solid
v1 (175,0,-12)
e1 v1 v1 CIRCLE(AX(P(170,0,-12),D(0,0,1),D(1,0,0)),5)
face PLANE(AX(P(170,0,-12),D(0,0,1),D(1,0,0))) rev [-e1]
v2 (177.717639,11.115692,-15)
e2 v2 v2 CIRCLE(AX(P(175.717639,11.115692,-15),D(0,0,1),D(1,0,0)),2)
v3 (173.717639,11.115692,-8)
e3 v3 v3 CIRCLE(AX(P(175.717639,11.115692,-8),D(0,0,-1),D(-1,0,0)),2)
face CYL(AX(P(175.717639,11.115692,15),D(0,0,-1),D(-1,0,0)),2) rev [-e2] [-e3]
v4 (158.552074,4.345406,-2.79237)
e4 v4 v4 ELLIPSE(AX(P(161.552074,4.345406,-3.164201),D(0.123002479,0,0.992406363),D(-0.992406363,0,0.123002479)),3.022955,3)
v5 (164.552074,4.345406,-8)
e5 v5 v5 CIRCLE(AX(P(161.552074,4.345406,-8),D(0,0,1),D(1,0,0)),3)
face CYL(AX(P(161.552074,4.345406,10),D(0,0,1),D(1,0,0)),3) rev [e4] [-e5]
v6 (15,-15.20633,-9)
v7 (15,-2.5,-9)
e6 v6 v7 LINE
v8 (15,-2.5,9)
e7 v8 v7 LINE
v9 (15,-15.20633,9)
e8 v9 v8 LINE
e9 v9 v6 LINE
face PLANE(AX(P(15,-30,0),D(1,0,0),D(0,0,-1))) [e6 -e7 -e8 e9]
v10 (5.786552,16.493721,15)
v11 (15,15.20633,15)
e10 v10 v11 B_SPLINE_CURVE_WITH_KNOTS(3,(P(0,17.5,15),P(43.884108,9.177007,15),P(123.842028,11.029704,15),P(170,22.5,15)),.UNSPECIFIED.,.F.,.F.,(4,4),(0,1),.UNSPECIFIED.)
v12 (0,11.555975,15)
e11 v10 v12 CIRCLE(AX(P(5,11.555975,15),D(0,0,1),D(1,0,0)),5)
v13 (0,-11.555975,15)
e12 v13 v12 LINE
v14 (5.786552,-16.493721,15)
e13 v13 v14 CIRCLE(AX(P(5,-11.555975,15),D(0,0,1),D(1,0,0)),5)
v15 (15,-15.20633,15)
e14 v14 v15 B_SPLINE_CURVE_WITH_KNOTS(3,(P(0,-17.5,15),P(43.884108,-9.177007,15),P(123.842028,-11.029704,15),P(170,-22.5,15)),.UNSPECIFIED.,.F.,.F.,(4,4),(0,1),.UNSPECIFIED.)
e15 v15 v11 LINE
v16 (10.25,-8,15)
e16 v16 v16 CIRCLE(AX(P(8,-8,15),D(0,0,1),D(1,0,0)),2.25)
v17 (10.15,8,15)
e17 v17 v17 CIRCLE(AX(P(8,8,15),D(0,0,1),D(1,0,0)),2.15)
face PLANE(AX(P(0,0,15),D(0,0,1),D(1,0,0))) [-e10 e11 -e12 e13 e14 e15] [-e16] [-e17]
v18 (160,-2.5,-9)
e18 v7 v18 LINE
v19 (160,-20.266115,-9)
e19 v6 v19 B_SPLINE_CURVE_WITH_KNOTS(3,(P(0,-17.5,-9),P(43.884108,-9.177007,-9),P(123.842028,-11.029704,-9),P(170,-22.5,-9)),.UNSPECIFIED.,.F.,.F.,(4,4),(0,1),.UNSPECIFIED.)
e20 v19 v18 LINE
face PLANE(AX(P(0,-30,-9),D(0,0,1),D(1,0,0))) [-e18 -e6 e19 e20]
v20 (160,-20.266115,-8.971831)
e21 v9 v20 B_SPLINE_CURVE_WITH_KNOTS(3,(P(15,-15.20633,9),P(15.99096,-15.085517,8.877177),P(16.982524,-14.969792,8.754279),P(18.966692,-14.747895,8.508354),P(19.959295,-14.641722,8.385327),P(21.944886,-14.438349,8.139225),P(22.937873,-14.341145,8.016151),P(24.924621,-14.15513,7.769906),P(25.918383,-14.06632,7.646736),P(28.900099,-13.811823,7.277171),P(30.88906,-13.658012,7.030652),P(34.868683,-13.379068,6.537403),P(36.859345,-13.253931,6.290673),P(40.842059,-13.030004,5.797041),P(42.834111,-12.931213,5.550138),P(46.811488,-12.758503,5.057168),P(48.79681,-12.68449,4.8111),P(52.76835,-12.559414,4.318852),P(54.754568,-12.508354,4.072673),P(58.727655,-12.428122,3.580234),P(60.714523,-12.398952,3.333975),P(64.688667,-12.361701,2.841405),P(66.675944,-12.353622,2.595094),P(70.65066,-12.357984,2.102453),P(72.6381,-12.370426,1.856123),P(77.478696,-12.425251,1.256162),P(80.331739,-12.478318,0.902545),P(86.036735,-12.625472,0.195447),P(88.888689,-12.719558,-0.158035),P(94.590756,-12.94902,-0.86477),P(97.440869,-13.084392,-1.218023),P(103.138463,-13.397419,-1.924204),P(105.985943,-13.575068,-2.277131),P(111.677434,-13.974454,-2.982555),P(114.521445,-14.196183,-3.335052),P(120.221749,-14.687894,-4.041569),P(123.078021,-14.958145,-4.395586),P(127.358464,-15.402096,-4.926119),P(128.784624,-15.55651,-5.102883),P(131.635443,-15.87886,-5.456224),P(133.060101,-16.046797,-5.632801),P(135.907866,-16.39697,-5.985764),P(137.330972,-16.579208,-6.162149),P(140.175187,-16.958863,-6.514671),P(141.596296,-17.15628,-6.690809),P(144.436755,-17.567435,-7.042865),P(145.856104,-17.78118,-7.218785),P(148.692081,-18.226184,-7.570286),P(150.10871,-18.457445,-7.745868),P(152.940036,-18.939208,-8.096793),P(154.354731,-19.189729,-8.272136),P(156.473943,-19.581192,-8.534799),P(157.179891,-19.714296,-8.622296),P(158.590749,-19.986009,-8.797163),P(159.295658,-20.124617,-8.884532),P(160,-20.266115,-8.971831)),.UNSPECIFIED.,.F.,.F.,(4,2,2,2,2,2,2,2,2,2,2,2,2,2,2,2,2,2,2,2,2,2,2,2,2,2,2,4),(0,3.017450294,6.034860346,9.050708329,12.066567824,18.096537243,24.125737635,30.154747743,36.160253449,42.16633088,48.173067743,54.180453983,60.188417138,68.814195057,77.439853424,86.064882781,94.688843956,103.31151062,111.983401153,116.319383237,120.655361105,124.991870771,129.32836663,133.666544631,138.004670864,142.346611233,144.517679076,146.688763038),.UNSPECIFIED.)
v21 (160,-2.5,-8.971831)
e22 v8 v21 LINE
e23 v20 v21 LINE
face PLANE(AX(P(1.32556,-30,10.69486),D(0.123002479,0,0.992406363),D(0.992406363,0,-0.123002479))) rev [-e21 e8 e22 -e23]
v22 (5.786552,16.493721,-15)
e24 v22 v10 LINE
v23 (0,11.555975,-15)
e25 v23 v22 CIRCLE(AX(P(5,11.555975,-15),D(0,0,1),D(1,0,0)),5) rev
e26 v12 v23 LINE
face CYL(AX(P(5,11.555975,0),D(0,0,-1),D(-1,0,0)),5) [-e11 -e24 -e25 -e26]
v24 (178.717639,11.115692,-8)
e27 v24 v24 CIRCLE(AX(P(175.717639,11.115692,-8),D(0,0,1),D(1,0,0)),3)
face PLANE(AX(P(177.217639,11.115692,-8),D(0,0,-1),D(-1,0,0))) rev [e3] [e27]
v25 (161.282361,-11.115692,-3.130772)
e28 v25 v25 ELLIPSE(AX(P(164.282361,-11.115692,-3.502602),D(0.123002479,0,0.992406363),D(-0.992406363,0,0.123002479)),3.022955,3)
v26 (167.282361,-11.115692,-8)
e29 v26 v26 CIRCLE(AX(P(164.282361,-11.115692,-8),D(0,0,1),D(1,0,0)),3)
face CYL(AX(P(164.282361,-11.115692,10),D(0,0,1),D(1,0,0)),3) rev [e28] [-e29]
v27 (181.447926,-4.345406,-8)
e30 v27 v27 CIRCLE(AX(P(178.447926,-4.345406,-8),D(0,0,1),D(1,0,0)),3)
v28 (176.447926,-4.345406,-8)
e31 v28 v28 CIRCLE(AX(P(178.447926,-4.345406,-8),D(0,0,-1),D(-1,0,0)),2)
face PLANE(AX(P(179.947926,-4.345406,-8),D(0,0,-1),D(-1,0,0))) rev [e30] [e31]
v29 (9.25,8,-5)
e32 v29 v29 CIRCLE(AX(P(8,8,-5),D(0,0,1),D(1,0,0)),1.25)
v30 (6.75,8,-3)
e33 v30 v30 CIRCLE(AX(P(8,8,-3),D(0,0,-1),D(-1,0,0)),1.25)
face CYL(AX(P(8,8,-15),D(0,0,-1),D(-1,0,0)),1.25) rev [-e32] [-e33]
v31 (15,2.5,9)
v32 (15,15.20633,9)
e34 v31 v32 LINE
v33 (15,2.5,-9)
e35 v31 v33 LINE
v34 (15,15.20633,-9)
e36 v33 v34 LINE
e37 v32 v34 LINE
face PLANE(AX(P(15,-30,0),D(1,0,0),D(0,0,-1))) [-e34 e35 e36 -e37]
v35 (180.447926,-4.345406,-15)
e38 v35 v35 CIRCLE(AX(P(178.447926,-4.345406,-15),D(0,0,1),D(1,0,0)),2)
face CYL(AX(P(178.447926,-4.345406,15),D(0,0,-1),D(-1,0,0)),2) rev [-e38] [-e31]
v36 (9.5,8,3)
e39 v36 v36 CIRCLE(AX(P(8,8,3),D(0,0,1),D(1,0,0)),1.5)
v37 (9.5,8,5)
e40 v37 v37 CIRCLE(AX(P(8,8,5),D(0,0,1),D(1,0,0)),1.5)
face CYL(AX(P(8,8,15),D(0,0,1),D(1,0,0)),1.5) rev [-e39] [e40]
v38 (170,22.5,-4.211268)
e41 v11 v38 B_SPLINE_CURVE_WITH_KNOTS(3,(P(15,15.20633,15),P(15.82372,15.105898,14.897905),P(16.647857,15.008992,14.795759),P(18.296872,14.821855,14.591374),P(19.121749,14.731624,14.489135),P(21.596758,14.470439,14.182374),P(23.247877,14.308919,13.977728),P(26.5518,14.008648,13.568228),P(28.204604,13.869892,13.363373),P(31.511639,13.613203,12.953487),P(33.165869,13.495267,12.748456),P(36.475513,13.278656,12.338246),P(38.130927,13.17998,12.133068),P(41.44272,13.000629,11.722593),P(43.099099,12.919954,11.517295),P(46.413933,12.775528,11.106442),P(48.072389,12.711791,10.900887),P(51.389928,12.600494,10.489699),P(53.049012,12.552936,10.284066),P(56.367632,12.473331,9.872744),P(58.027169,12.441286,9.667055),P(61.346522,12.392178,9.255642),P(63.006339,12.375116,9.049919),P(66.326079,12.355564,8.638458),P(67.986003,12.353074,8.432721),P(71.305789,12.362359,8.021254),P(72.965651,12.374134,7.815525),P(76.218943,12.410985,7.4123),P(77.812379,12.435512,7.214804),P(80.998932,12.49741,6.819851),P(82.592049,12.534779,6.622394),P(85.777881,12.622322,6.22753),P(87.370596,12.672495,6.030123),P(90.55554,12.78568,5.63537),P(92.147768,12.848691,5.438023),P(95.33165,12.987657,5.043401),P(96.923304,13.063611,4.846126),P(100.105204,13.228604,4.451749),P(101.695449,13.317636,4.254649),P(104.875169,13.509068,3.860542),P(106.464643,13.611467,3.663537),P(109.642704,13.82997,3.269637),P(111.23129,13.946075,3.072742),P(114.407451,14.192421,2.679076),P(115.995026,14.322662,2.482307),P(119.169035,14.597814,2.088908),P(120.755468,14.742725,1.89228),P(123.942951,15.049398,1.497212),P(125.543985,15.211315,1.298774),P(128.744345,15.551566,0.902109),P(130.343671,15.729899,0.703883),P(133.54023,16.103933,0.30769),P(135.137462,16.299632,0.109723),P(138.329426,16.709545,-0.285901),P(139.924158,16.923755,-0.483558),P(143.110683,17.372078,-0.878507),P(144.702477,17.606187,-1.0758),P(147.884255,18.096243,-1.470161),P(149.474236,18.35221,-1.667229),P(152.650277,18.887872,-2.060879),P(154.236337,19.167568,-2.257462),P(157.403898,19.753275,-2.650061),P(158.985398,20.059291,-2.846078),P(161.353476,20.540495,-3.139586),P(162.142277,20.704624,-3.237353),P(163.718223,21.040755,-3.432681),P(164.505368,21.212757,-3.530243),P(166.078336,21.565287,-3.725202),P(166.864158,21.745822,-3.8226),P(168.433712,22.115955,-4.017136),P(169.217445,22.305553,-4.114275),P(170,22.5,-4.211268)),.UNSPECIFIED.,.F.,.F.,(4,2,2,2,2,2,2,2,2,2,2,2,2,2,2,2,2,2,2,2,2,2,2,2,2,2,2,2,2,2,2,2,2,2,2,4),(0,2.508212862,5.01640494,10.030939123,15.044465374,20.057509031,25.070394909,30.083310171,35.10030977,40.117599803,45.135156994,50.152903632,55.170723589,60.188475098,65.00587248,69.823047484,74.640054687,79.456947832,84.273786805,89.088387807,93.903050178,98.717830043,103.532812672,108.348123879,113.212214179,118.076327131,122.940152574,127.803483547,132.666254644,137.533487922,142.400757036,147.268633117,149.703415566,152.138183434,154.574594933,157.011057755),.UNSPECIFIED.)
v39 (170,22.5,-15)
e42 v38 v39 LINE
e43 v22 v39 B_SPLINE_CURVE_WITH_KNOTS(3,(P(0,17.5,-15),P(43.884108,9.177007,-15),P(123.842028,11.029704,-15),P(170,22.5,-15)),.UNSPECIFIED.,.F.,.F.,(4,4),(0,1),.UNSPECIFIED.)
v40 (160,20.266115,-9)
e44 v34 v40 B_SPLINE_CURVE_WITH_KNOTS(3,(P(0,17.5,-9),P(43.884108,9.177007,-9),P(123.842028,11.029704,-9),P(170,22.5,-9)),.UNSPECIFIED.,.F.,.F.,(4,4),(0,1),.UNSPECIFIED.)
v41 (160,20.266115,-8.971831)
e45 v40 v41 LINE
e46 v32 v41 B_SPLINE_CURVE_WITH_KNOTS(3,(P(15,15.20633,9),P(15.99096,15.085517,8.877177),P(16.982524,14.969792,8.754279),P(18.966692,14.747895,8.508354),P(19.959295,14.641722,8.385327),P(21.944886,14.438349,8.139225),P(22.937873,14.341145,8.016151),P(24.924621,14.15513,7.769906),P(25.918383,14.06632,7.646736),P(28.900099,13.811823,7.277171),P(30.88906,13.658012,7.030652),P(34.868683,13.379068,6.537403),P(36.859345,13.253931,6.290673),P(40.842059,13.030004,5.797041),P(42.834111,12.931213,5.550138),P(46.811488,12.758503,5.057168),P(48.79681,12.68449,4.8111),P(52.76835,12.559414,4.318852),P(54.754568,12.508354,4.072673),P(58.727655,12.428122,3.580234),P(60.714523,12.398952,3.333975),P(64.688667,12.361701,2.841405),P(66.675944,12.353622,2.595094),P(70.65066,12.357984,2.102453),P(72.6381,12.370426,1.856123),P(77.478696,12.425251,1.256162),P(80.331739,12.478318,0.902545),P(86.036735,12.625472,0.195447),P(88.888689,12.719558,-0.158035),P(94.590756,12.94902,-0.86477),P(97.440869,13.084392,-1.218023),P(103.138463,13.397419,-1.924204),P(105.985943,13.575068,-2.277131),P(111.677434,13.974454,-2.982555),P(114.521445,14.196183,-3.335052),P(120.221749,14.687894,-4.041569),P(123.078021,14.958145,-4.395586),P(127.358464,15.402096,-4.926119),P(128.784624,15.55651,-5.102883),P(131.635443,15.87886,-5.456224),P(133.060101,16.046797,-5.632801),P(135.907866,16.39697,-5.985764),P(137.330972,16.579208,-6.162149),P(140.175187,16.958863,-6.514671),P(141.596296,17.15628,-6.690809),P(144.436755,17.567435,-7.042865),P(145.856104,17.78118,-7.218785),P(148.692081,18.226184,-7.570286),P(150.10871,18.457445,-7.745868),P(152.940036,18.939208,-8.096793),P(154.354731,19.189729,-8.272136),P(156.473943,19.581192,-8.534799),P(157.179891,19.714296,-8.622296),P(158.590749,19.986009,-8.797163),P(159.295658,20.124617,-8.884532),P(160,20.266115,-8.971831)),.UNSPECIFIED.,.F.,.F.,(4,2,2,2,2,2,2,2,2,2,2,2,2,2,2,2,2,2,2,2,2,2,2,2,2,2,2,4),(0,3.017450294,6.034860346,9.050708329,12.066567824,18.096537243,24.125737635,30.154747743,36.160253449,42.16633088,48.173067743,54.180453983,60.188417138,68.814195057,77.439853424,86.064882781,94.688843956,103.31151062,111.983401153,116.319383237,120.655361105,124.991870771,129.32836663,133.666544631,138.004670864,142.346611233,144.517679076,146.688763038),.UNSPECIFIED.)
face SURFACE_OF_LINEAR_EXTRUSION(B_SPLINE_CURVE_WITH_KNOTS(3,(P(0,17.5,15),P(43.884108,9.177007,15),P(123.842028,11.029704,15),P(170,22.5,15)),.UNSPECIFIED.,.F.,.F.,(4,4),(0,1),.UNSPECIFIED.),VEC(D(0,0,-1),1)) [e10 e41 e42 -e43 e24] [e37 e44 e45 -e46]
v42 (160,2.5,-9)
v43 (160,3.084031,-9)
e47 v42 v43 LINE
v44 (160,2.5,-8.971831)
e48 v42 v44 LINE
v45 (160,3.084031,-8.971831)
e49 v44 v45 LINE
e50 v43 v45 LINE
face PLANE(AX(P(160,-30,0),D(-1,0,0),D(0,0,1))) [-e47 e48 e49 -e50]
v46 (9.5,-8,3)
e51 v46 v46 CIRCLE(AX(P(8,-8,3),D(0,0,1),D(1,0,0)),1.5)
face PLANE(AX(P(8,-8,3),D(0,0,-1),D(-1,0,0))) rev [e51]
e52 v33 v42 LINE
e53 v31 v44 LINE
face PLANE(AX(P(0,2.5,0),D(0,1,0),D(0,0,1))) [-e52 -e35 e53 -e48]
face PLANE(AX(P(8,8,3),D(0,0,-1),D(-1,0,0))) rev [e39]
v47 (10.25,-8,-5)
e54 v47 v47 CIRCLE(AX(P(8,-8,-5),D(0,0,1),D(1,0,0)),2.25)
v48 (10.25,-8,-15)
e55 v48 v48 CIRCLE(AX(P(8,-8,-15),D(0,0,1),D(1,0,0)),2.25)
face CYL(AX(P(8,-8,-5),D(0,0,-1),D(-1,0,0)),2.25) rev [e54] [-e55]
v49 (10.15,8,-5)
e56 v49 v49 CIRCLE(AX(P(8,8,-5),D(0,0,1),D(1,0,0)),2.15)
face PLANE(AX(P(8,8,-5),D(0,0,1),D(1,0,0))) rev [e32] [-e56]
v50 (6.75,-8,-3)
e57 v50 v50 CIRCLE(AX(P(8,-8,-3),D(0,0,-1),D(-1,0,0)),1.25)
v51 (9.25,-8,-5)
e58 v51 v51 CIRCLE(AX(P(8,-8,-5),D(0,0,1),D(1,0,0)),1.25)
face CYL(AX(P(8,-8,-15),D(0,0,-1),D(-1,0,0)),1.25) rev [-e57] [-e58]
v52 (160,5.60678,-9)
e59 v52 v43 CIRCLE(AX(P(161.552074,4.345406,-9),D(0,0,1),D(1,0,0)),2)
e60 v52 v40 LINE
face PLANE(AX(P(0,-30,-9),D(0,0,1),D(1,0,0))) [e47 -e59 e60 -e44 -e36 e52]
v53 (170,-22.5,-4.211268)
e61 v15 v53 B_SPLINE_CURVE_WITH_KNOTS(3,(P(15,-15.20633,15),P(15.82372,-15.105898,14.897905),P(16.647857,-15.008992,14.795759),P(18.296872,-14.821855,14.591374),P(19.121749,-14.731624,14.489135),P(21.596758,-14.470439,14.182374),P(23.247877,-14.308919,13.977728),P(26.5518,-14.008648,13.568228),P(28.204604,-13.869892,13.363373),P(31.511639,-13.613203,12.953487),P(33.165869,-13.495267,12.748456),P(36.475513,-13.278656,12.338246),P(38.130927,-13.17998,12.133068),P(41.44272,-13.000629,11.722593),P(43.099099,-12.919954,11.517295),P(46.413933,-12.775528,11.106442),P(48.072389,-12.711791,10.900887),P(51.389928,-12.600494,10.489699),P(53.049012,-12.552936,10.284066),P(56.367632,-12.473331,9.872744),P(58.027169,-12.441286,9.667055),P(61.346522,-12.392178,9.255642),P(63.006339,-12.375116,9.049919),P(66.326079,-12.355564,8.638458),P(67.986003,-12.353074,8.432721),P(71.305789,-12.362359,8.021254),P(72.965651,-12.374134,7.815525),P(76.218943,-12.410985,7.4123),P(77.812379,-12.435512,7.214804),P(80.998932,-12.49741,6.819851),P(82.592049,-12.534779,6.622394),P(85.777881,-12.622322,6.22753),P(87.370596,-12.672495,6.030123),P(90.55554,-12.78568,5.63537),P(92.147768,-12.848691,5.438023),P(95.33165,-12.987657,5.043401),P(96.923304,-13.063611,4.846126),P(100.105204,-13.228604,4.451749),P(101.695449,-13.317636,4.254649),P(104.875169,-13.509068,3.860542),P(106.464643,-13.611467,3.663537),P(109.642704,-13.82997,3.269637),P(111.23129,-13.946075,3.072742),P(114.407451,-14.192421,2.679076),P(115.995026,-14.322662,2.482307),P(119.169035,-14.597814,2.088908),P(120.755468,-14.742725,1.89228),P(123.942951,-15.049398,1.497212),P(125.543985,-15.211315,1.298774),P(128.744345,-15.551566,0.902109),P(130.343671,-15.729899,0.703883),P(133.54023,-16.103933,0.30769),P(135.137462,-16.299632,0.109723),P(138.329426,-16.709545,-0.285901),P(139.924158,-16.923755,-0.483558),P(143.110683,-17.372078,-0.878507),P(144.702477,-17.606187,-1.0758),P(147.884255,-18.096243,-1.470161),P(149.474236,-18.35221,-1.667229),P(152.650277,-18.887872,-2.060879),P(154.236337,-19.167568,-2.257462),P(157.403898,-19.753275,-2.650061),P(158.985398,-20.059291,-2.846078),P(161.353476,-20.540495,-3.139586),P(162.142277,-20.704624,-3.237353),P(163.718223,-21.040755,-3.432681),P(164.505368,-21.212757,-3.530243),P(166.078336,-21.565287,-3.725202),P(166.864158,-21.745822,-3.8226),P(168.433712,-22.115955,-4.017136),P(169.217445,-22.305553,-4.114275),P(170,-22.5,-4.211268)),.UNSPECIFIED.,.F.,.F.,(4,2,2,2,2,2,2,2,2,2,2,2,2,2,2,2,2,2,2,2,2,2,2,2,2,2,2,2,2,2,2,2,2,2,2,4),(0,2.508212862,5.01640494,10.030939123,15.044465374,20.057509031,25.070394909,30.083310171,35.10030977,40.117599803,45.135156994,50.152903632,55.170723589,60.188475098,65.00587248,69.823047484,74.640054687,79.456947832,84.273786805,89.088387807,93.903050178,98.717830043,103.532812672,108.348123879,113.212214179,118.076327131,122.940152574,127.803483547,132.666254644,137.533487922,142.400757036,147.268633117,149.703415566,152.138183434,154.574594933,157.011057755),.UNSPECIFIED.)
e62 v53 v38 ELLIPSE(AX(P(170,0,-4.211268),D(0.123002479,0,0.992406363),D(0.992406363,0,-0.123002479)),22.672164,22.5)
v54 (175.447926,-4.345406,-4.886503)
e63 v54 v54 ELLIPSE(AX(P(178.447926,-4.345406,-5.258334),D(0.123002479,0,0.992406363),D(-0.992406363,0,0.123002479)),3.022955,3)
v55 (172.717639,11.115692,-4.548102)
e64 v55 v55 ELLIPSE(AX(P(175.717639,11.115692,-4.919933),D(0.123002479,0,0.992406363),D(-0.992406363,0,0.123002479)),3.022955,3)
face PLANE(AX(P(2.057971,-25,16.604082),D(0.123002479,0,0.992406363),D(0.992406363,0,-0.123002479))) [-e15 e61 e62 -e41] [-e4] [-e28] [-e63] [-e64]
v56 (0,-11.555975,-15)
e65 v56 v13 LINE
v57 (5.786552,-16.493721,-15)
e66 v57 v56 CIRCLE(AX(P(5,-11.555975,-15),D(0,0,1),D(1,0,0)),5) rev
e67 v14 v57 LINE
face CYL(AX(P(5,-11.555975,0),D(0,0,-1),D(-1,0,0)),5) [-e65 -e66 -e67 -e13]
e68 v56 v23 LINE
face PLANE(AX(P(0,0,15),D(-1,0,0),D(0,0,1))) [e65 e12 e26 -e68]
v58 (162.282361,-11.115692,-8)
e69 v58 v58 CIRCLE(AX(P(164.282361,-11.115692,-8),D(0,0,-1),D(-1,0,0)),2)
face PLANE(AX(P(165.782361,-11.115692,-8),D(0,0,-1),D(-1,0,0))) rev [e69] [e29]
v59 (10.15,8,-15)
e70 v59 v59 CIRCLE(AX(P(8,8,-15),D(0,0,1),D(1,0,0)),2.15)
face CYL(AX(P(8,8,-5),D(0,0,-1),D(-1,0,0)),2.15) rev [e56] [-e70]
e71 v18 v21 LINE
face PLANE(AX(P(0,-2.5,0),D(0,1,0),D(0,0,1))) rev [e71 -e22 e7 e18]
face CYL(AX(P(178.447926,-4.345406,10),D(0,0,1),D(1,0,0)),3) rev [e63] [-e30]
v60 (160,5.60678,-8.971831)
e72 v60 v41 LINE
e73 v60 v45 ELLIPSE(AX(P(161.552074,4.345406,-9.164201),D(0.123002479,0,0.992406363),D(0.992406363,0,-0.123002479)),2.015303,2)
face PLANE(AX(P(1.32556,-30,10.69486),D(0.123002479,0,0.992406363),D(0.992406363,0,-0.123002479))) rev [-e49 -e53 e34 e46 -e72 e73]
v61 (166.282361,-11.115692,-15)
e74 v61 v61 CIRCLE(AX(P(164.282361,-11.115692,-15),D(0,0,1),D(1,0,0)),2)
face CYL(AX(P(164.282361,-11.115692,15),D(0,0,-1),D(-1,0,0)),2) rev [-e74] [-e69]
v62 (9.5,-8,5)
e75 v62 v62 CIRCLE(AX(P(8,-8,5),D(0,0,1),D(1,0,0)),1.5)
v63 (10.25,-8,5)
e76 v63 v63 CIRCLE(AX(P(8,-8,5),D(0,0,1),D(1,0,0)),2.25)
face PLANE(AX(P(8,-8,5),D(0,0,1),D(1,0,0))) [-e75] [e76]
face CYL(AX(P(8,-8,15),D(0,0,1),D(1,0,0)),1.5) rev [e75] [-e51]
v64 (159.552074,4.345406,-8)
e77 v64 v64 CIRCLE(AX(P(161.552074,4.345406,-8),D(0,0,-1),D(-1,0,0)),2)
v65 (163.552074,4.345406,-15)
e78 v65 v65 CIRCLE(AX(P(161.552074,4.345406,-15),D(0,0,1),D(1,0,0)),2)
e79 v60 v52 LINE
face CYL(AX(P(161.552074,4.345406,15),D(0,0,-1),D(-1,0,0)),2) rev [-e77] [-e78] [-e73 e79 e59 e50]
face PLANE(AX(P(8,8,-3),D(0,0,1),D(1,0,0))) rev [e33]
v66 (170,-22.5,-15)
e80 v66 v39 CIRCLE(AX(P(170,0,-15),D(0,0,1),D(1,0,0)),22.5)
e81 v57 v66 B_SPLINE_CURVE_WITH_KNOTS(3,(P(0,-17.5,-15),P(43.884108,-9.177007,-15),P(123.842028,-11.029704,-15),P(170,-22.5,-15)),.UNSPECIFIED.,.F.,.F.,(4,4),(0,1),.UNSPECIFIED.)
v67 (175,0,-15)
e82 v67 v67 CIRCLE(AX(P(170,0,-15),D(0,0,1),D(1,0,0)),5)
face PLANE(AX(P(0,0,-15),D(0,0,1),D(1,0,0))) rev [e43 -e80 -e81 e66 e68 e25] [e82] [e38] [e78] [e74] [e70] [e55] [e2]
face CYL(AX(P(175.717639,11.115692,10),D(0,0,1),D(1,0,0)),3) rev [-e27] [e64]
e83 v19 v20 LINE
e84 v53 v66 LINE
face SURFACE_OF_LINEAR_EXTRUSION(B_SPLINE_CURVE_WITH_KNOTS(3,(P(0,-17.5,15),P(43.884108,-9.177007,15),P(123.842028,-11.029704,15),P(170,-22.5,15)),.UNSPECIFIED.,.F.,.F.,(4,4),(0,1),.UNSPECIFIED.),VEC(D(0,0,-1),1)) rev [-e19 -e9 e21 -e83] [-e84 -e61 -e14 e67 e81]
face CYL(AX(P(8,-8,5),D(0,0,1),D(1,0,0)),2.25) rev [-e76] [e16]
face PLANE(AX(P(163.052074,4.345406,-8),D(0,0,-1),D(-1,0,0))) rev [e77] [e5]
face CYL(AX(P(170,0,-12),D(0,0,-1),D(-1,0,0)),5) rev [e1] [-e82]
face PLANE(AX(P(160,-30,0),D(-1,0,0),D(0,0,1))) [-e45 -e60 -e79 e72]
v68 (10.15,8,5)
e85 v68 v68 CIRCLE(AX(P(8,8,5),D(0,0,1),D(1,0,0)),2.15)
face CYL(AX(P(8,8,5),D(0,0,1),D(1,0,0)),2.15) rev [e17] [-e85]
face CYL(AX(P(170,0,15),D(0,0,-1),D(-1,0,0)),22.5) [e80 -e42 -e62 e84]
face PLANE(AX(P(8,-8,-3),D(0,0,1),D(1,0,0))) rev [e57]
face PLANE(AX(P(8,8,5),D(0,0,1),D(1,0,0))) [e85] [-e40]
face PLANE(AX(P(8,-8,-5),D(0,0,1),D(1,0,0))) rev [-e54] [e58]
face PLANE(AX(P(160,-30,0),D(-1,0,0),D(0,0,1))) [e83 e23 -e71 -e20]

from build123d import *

# Parameters (mm, degrees)
SKETCH1_R                                        = 2
BOSS_EXTRUDE1_DEPTH                              = 15
CUT_EXTRUDE7_START                               = 15
SKETCH1_3_R                                      = 5
CUT_EXTRUDE7_DEPTH                               = 4
CUT_EXTRUDE2_START                               = -22.5000001
CUT_EXTRUDE2_DEPTH                               = 45.0000001
CUT_EXTRUDE6_DEPTH                               = 30
CBORE_FOR_M3_HEX_HEAD_MACHINE_SCREW3_D           = 3
CBORE_FOR_M3_HEX_HEAD_MACHINE_SCREW3_DEPTH       = 25
CBORE_FOR_M3_HEX_HEAD_MACHINE_SCREW3_CBORE_D     = 6
CBORE_FOR_M3_HEX_HEAD_MACHINE_SCREW3_CBORE_DEPTH = 18
CBORE_FOR_M3_HEX_HEAD_MACHINE_SCREW3_TIP         = 0.901290929
CUT_EXTRUDE4_START                               = 15
SKETCH19_R                                       = 2.15
SKETCH19_R_2                                     = 2.25
CUT_EXTRUDE4_DEPTH                               = 10
CUT_EXTRUDE5_START                               = -5
SKETCH19_2_R                                     = 2.15
SKETCH19_2_R_2                                   = 2.25
CUT_EXTRUDE5_DEPTH                               = 10
BOSS_EXTRUDE3_DEPTH                              = 2.5
CBORE_FOR_M3_SHCS2_D                             = 3
CBORE_FOR_M3_SHCS2_DEPTH                         = 12
CBORE_FOR_M3_SHCS2_CBORE_D                       = 4.3
CBORE_FOR_M3_SHCS2_CBORE_DEPTH                   = 5.2
CBORE_FOR_M3_SHCS3_D                             = 2.5
CBORE_FOR_M3_SHCS3_DEPTH                         = 12
CBORE_FOR_M3_SHCS3_CBORE_D                       = 4.3
CBORE_FOR_M3_SHCS3_CBORE_DEPTH                   = 5.2
FILLET2_R                                        = 5
CUT_EXTRUDE9_START                               = -15
SKETCH1_5_R                                      = 5
CUT_EXTRUDE9_DEPTH                               = 3


# Read off the part's stored shape, not the designer's step: Cut-Extrude2
with BuildPart() as part:
    # Sketch1 → Boss-Extrude1 (new, symmetric)
    with BuildSketch(Plane.XY):
        with BuildLine():
            Line((0, 17.5), (0, -17.5))
            add(Edge.make_bspline(
                [(0, -17.5), (43.884108447, -9.177006937), (123.842028205, -11.029704256), (170, -22.5)],
                knots=[0, 0, 0, 0, 1, 1, 1, 1], degree=3))
            ThreePointArc((170, -22.5), (192.5, 0), (170, 22.5))
            add(Edge.make_bspline(
                [(170, 22.5), (123.842028205, 11.029704256), (43.884108447, 9.177006937), (0, 17.5)],
                knots=[0.933681919, 0.933681919, 0.933681919, 0.933681919, 1.933681919, 1.933681919, 1.933681919, 1.933681919], degree=3))
        make_face()
        with Locations((175.71763899, 11.115691808)):
            Circle(SKETCH1_R, mode=Mode.SUBTRACT)
        with Locations((164.28236101, -11.115691808)):
            Circle(SKETCH1_R, mode=Mode.SUBTRACT)
        with Locations((178.447925774, -4.345405633)):
            Circle(SKETCH1_R, mode=Mode.SUBTRACT)
        with Locations((161.552074226, 4.345405633)):
            Circle(SKETCH1_R, mode=Mode.SUBTRACT)
    extrude(amount=BOSS_EXTRUDE1_DEPTH, both=True)

    # Sketch1<3> → Cut-Extrude7 (cut)
    with BuildSketch(Plane.XY.offset(CUT_EXTRUDE7_START)):
        with Locations((170, 0)):
            Circle(SKETCH1_3_R)
    extrude(amount=-CUT_EXTRUDE7_DEPTH, mode=Mode.SUBTRACT)

    # Cut-Extrude2 outline → Cut-Extrude2 (cut)
    with BuildSketch(Plane(origin=(0, 0, 0), x_dir=(1, 0, 0), z_dir=(0, 1, 0)).offset(CUT_EXTRUDE2_START)):
        Polygon((14.999999991, -15.000000001), (194, -15), (194, 7.185915493), (192.500000099, 7.000000012), align=None)
    extrude(amount=CUT_EXTRUDE2_DEPTH, mode=Mode.SUBTRACT)

    # Sketch20 → Cut-Extrude6 (cut, symmetric)
    with BuildSketch(Plane(origin=(0, 0, 0), x_dir=(1, 0, 0), z_dir=(0, 1, 0))):
        Polygon((15, -9), (15, 9), (160, 9), (160, 8.971830985), align=None)
    extrude(amount=CUT_EXTRUDE6_DEPTH, both=True, mode=Mode.SUBTRACT)

    # CBORE for M3 Hex Head Machine Screw3
    with Locations(Plane(origin=(0, 0, 10), x_dir=(-1, 0, 0), z_dir=(0, 0, 1))):
        with Locations((-175.71763899, -11.115691808), (-161.552074226, -4.345405633), (-164.28236101, 11.115691808), (-178.447925774, 4.345405633)):
            CounterBoreHole(CBORE_FOR_M3_HEX_HEAD_MACHINE_SCREW3_D / 2, CBORE_FOR_M3_HEX_HEAD_MACHINE_SCREW3_CBORE_D / 2, CBORE_FOR_M3_HEX_HEAD_MACHINE_SCREW3_CBORE_DEPTH, depth=CBORE_FOR_M3_HEX_HEAD_MACHINE_SCREW3_DEPTH)
            with Locations((0, 0, -(CBORE_FOR_M3_HEX_HEAD_MACHINE_SCREW3_DEPTH + CBORE_FOR_M3_HEX_HEAD_MACHINE_SCREW3_TIP / 2))):  # 118° drill point
                Cone(0, CBORE_FOR_M3_HEX_HEAD_MACHINE_SCREW3_D / 2, CBORE_FOR_M3_HEX_HEAD_MACHINE_SCREW3_TIP, mode=Mode.SUBTRACT)

    # Sketch19 → Cut-Extrude4 (cut)
    with BuildSketch(Plane.XY.offset(CUT_EXTRUDE4_START)):
        with Locations((8, 8)):
            Circle(SKETCH19_R)
        with Locations((8, -8)):
            Circle(SKETCH19_R_2)
    extrude(amount=-CUT_EXTRUDE4_DEPTH, mode=Mode.SUBTRACT)

    # Sketch19<2> → Cut-Extrude5 (cut)
    with BuildSketch(Plane.XY.offset(CUT_EXTRUDE5_START)):
        with Locations((8, 8)):
            Circle(SKETCH19_2_R)
        with Locations((8, -8)):
            Circle(SKETCH19_2_R_2)
    extrude(amount=-CUT_EXTRUDE5_DEPTH, mode=Mode.SUBTRACT)

    # Sketch20<3> → Boss-Extrude3 (add, symmetric)
    with BuildSketch(Plane(origin=(0, 0, 0), x_dir=(1, 0, 0), z_dir=(0, 1, 0))):
        Polygon((15, -9), (15, 9), (160, 9), (160, 8.971830985), align=None)
    extrude(amount=BOSS_EXTRUDE3_DEPTH, both=True)

    # CBORE for M3 SHCS2
    with Locations(Plane.XY.offset(15)):
        with Locations((8, 8), (8, -8)):
            CounterBoreHole(CBORE_FOR_M3_SHCS2_D / 2, CBORE_FOR_M3_SHCS2_CBORE_D / 2, CBORE_FOR_M3_SHCS2_CBORE_DEPTH, depth=CBORE_FOR_M3_SHCS2_DEPTH)

    # CBORE for M3 SHCS3
    with Locations(Plane(origin=(0, 0, -15), x_dir=(-1, 0, 0), z_dir=(0, 0, -1))):
        with Locations((-8, 8), (-8, -8)):
            CounterBoreHole(CBORE_FOR_M3_SHCS3_D / 2, CBORE_FOR_M3_SHCS3_CBORE_D / 2, CBORE_FOR_M3_SHCS3_CBORE_DEPTH, depth=CBORE_FOR_M3_SHCS3_DEPTH)

    # Fillet2
    fillet2_edges = [part.edges().sort_by_distance(p)[0] for p in [
        (0, 17.5, -7.5),
        (0, -17.5, 7.5),
    ]]
    fillet(fillet2_edges, radius=FILLET2_R)

    # Sketch1<5> → Cut-Extrude9 (cut)
    with BuildSketch(Plane.XY.offset(CUT_EXTRUDE9_START)):
        with Locations((170, 0)):
            Circle(SKETCH1_5_R)
    extrude(amount=CUT_EXTRUDE9_DEPTH, mode=Mode.SUBTRACT)


solid = part.part
